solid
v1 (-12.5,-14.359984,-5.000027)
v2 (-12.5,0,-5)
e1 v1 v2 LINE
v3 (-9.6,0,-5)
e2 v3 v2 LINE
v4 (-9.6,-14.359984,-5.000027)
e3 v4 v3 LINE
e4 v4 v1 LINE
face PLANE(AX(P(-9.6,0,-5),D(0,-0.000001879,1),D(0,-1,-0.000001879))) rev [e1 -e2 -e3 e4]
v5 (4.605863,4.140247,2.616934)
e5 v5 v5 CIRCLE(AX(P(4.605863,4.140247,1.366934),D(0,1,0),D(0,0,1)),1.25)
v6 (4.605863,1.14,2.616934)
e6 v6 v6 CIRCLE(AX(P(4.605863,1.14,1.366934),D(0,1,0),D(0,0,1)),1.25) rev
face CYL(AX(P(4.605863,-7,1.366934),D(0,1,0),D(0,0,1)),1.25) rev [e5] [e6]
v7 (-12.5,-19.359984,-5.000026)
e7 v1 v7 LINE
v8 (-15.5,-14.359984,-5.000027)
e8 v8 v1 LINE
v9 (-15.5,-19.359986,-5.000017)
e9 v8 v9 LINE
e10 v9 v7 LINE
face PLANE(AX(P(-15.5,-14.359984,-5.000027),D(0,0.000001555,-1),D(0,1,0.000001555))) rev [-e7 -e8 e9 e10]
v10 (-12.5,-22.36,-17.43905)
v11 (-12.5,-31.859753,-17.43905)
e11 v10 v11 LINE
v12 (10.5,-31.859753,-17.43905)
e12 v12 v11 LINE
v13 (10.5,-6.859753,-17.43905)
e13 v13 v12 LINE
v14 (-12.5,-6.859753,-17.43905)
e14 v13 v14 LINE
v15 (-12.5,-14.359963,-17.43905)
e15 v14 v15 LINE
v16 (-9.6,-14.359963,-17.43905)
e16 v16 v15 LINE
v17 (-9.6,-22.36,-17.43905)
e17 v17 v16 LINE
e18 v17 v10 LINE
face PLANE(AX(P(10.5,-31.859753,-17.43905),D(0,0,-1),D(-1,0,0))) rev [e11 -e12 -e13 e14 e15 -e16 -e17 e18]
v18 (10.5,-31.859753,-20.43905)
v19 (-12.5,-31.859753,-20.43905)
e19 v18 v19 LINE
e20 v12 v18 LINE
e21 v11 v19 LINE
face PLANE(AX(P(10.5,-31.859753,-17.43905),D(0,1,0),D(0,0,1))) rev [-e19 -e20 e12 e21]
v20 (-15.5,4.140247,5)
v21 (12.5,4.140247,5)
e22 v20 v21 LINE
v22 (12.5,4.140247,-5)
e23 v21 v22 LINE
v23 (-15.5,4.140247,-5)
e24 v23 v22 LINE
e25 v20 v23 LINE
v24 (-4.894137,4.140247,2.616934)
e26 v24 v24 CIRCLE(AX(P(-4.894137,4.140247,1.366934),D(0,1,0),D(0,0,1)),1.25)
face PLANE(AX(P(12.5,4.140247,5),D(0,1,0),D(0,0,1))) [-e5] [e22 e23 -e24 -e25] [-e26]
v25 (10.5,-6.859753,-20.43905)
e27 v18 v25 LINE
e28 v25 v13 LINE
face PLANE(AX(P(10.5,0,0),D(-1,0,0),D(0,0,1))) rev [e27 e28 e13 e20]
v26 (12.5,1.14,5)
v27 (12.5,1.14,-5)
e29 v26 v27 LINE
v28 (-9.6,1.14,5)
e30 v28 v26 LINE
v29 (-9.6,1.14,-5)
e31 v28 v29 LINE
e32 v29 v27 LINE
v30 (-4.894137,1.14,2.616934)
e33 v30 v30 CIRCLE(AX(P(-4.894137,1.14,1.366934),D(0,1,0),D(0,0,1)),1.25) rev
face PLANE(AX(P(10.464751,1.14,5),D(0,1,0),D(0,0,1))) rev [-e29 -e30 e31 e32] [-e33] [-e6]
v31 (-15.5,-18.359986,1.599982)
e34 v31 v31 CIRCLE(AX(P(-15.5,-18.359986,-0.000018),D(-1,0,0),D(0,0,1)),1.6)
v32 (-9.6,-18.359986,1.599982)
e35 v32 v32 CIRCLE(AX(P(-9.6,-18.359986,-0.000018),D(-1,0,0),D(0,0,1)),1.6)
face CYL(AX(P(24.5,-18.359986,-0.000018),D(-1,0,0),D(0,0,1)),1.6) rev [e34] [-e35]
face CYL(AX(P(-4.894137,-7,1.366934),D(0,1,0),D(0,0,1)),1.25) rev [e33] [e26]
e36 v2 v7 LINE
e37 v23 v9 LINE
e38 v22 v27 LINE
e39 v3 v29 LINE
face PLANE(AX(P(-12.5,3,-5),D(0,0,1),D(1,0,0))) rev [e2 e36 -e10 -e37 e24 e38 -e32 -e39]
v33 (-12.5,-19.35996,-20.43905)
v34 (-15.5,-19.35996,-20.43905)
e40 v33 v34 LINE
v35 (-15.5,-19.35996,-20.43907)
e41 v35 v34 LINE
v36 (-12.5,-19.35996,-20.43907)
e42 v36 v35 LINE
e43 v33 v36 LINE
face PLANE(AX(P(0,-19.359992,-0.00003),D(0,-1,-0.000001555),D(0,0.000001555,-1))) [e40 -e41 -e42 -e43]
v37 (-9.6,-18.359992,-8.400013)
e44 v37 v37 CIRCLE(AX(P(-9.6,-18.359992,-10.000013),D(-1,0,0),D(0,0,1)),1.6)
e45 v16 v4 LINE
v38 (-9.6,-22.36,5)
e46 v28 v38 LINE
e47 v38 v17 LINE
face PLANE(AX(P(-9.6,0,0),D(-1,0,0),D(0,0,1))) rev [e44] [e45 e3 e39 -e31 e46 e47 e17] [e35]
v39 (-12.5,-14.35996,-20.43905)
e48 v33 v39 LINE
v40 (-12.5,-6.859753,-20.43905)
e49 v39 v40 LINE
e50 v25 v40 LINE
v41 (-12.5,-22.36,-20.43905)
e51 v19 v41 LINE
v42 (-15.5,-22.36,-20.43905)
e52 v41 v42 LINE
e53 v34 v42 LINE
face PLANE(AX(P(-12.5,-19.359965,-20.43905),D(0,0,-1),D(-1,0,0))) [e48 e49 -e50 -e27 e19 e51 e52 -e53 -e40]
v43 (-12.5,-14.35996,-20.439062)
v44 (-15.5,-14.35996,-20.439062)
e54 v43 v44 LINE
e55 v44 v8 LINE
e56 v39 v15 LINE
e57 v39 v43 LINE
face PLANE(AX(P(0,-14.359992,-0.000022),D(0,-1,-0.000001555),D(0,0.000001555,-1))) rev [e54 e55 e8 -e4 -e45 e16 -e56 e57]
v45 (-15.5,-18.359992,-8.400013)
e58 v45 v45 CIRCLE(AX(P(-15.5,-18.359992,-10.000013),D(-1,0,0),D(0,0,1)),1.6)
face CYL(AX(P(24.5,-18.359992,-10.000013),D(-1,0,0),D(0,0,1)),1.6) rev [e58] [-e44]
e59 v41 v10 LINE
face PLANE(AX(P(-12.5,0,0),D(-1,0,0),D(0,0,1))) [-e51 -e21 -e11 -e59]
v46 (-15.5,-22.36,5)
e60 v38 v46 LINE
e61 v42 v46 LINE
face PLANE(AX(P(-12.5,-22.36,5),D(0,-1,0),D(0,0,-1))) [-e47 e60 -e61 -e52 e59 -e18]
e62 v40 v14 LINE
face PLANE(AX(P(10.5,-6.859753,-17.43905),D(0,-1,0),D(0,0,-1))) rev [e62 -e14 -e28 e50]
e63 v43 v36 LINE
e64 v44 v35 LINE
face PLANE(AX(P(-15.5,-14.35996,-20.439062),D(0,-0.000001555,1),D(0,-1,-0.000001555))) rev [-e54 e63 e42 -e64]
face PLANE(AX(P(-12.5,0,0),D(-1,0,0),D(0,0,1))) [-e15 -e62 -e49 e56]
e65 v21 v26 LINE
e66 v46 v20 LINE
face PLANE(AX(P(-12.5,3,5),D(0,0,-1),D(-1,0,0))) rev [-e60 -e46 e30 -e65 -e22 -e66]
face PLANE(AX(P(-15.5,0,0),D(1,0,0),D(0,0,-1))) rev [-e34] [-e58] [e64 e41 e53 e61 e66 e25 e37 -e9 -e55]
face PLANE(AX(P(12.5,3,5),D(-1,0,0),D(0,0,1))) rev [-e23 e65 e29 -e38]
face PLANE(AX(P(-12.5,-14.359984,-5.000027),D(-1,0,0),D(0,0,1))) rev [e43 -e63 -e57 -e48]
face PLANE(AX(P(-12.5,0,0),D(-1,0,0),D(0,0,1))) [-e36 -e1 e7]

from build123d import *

# Parameters (mm, degrees)
SKETCH1_W               = 25
SKETCH1_H               = 10
BOSS_EXTRUDE1_DEPTH     = 3
SKETCH2_R               = 1.25
CUT_EXTRUDE1_DEPTH      = 10
SKETCH3_W               = 10
SKETCH3_H               = 3
BOSS_EXTRUDE2_DEPTH     = 3
SKETCH4_W               = 3
SKETCH4_H               = 19.36
BOSS_EXTRUDE3_DEPTH     = 10
BOSS_EXTRUDE4_DEPTH     = 3
SKETCH6_W               = 3
SKETCH6_H               = 25
BOSS_EXTRUDE5_DEPTH     = 23
SKETCH7_W               = 3
SKETCH7_H               = 15.439035089
BOSS_EXTRUDE6_DEPTH     = 5
BOSS_EXTRUDE7_DEPTH     = 2.9
BOSS_EXTRUDE8_DEPTH     = 10
CUT_EXTRUDE2_DEPTH      = 10
CUT_EXTRUDE3_DEPTH      = 42.797000958
CUT_EXTRUDE3_DEPTH_BACK = 42.797000958
SKETCH11_R              = 1.25
SKETCH12_R              = 1.6
CUT_EXTRUDE4_DEPTH      = 40


with BuildPart() as part:
    # Sketch1 → Boss-Extrude1 (new body)
    with BuildSketch(Plane(origin=(0, 0, 0), x_dir=(1, 0, 0), z_dir=(0, 1, 0))):
        Rectangle(SKETCH1_W, SKETCH1_H)
    extrude(amount=BOSS_EXTRUDE1_DEPTH)

    # Sketch2 → Cut-Extrude1 (cut)
    with BuildSketch(Plane(origin=(0, 3, 0), x_dir=(1, 0, 0), z_dir=(0, 1, 0))):
        with Locations((-4.894136616, -1.366933975)):
            Circle(SKETCH2_R)
        with Locations((4.605863384, -1.366933975)):
            Circle(SKETCH2_R)
    extrude(amount=-CUT_EXTRUDE1_DEPTH, mode=Mode.SUBTRACT)

    # Sketch3 → Boss-Extrude2 (add)
    with BuildSketch(Plane.ZY.offset(12.5)):
        with Locations((0, 1.5)):
            Rectangle(SKETCH3_W, SKETCH3_H)
    extrude(amount=BOSS_EXTRUDE2_DEPTH)

    # Sketch4 → Boss-Extrude3 (add)
    with BuildSketch(Plane(origin=(0, 0, -5), x_dir=(-1, 0, 0), z_dir=(0, 0, -1))):
        with Locations((14, -9.68)):
            Rectangle(SKETCH4_W, SKETCH4_H)
    extrude(amount=-BOSS_EXTRUDE3_DEPTH)

    # Sketch5 → Boss-Extrude4 (add)
    with BuildSketch(Plane.ZY.offset(15.5)):
        Polygon((5, -19.36), (5, -22.36), (-17.439050417, -22.36), (-20.439050417, -22.36), (-20.439050417, -19.359965116), (-17.439050417, -19.359965116), align=None)
    extrude(amount=-BOSS_EXTRUDE4_DEPTH)

    # Sketch6 → Boss-Extrude5 (add)
    with BuildSketch(Plane(origin=(-12.5, 0, 0), x_dir=(0, 0, -1), z_dir=(1, 0, 0))):
        with Locations((18.939050417, -19.359753222)):
            Rectangle(SKETCH6_W, SKETCH6_H)
    extrude(amount=BOSS_EXTRUDE5_DEPTH)


with BuildPart() as boss_extrude6_tool:
    # Sketch7 → Boss-Extrude6 (new body)
    with BuildSketch(Plane(origin=(0, -19.359992227, -3.0098e-05), x_dir=(1, 0, 0), z_dir=(0, 0.9999999999987916, 1.5546330463646684e-06))):
        with Locations((-14, 12.719522209)):
            Rectangle(SKETCH7_W, SKETCH7_H)
    extrude(amount=BOSS_EXTRUDE6_DEPTH)


with BuildPart() as part_1:
    add(part.part)


with BuildPart() as part_2:
    # Boss-Extrude6: joined with boss_extrude6_tool
    add(part_1.part.fuse(boss_extrude6_tool.part, tol=0.00001))

    # Sketch8 → Boss-Extrude7 (add)
    with BuildSketch(Plane(origin=(-12.5, 0, 0), x_dir=(0, 0, -1), z_dir=(1, 0, 0))):
        Polygon((17.439050417, -22.36), (-5, -22.36), (-5, 0), (5, 0), (5.000026988, -14.359984454), (17.439050417, -14.359962784), align=None)
    extrude(amount=BOSS_EXTRUDE7_DEPTH)

    # Sketch9 → Boss-Extrude8 (add)
    with BuildSketch(Plane(origin=(0, 0, -5), x_dir=(-1, 0, 0), z_dir=(0, 0, -1))):
        Polygon((1, 1.140246778), (15.5, 1.140246778), (15.5, 4.140246778), (-12.5, 4.140246778), (-12.5, 1.140246778), align=None)
    extrude(amount=-BOSS_EXTRUDE8_DEPTH)

    # Sketch10 → Cut-Extrude2 (cut)
    with BuildSketch(Plane(origin=(0, 0, -5), x_dir=(-1, 0, 0), z_dir=(0, 0, -1))):
        Polygon((-10.464750731, 1.14), (9.6, 1.14), (9.6, 0), (-12.5, 0), (-12.5, 1.14), align=None)
    extrude(amount=-CUT_EXTRUDE2_DEPTH, mode=Mode.SUBTRACT)

    # Sketch11 → Cut-Extrude3 (cut, two sides: drawn at the far end of the back side and taken through both)
    with BuildSketch(Plane.XZ.offset(-1.14).offset(-CUT_EXTRUDE3_DEPTH_BACK)):
        with Locations((-4.894136616, 1.366933975)):
            Circle(SKETCH11_R)
        with Locations((4.605863384, 1.366933975)):
            Circle(SKETCH11_R)
    extrude(amount=CUT_EXTRUDE3_DEPTH + CUT_EXTRUDE3_DEPTH_BACK, mode=Mode.SUBTRACT)

    # Sketch12 → Cut-Extrude4 (cut)
    with BuildSketch(Plane.ZY.offset(15.5)):
        with Locations((-1.8211e-05, -18.359986331)):
            Circle(SKETCH12_R)
        with Locations((-10.000013494, -18.359992227)):
            Circle(SKETCH12_R)
    extrude(amount=-CUT_EXTRUDE4_DEPTH, mode=Mode.SUBTRACT)


solid = part_2.part
